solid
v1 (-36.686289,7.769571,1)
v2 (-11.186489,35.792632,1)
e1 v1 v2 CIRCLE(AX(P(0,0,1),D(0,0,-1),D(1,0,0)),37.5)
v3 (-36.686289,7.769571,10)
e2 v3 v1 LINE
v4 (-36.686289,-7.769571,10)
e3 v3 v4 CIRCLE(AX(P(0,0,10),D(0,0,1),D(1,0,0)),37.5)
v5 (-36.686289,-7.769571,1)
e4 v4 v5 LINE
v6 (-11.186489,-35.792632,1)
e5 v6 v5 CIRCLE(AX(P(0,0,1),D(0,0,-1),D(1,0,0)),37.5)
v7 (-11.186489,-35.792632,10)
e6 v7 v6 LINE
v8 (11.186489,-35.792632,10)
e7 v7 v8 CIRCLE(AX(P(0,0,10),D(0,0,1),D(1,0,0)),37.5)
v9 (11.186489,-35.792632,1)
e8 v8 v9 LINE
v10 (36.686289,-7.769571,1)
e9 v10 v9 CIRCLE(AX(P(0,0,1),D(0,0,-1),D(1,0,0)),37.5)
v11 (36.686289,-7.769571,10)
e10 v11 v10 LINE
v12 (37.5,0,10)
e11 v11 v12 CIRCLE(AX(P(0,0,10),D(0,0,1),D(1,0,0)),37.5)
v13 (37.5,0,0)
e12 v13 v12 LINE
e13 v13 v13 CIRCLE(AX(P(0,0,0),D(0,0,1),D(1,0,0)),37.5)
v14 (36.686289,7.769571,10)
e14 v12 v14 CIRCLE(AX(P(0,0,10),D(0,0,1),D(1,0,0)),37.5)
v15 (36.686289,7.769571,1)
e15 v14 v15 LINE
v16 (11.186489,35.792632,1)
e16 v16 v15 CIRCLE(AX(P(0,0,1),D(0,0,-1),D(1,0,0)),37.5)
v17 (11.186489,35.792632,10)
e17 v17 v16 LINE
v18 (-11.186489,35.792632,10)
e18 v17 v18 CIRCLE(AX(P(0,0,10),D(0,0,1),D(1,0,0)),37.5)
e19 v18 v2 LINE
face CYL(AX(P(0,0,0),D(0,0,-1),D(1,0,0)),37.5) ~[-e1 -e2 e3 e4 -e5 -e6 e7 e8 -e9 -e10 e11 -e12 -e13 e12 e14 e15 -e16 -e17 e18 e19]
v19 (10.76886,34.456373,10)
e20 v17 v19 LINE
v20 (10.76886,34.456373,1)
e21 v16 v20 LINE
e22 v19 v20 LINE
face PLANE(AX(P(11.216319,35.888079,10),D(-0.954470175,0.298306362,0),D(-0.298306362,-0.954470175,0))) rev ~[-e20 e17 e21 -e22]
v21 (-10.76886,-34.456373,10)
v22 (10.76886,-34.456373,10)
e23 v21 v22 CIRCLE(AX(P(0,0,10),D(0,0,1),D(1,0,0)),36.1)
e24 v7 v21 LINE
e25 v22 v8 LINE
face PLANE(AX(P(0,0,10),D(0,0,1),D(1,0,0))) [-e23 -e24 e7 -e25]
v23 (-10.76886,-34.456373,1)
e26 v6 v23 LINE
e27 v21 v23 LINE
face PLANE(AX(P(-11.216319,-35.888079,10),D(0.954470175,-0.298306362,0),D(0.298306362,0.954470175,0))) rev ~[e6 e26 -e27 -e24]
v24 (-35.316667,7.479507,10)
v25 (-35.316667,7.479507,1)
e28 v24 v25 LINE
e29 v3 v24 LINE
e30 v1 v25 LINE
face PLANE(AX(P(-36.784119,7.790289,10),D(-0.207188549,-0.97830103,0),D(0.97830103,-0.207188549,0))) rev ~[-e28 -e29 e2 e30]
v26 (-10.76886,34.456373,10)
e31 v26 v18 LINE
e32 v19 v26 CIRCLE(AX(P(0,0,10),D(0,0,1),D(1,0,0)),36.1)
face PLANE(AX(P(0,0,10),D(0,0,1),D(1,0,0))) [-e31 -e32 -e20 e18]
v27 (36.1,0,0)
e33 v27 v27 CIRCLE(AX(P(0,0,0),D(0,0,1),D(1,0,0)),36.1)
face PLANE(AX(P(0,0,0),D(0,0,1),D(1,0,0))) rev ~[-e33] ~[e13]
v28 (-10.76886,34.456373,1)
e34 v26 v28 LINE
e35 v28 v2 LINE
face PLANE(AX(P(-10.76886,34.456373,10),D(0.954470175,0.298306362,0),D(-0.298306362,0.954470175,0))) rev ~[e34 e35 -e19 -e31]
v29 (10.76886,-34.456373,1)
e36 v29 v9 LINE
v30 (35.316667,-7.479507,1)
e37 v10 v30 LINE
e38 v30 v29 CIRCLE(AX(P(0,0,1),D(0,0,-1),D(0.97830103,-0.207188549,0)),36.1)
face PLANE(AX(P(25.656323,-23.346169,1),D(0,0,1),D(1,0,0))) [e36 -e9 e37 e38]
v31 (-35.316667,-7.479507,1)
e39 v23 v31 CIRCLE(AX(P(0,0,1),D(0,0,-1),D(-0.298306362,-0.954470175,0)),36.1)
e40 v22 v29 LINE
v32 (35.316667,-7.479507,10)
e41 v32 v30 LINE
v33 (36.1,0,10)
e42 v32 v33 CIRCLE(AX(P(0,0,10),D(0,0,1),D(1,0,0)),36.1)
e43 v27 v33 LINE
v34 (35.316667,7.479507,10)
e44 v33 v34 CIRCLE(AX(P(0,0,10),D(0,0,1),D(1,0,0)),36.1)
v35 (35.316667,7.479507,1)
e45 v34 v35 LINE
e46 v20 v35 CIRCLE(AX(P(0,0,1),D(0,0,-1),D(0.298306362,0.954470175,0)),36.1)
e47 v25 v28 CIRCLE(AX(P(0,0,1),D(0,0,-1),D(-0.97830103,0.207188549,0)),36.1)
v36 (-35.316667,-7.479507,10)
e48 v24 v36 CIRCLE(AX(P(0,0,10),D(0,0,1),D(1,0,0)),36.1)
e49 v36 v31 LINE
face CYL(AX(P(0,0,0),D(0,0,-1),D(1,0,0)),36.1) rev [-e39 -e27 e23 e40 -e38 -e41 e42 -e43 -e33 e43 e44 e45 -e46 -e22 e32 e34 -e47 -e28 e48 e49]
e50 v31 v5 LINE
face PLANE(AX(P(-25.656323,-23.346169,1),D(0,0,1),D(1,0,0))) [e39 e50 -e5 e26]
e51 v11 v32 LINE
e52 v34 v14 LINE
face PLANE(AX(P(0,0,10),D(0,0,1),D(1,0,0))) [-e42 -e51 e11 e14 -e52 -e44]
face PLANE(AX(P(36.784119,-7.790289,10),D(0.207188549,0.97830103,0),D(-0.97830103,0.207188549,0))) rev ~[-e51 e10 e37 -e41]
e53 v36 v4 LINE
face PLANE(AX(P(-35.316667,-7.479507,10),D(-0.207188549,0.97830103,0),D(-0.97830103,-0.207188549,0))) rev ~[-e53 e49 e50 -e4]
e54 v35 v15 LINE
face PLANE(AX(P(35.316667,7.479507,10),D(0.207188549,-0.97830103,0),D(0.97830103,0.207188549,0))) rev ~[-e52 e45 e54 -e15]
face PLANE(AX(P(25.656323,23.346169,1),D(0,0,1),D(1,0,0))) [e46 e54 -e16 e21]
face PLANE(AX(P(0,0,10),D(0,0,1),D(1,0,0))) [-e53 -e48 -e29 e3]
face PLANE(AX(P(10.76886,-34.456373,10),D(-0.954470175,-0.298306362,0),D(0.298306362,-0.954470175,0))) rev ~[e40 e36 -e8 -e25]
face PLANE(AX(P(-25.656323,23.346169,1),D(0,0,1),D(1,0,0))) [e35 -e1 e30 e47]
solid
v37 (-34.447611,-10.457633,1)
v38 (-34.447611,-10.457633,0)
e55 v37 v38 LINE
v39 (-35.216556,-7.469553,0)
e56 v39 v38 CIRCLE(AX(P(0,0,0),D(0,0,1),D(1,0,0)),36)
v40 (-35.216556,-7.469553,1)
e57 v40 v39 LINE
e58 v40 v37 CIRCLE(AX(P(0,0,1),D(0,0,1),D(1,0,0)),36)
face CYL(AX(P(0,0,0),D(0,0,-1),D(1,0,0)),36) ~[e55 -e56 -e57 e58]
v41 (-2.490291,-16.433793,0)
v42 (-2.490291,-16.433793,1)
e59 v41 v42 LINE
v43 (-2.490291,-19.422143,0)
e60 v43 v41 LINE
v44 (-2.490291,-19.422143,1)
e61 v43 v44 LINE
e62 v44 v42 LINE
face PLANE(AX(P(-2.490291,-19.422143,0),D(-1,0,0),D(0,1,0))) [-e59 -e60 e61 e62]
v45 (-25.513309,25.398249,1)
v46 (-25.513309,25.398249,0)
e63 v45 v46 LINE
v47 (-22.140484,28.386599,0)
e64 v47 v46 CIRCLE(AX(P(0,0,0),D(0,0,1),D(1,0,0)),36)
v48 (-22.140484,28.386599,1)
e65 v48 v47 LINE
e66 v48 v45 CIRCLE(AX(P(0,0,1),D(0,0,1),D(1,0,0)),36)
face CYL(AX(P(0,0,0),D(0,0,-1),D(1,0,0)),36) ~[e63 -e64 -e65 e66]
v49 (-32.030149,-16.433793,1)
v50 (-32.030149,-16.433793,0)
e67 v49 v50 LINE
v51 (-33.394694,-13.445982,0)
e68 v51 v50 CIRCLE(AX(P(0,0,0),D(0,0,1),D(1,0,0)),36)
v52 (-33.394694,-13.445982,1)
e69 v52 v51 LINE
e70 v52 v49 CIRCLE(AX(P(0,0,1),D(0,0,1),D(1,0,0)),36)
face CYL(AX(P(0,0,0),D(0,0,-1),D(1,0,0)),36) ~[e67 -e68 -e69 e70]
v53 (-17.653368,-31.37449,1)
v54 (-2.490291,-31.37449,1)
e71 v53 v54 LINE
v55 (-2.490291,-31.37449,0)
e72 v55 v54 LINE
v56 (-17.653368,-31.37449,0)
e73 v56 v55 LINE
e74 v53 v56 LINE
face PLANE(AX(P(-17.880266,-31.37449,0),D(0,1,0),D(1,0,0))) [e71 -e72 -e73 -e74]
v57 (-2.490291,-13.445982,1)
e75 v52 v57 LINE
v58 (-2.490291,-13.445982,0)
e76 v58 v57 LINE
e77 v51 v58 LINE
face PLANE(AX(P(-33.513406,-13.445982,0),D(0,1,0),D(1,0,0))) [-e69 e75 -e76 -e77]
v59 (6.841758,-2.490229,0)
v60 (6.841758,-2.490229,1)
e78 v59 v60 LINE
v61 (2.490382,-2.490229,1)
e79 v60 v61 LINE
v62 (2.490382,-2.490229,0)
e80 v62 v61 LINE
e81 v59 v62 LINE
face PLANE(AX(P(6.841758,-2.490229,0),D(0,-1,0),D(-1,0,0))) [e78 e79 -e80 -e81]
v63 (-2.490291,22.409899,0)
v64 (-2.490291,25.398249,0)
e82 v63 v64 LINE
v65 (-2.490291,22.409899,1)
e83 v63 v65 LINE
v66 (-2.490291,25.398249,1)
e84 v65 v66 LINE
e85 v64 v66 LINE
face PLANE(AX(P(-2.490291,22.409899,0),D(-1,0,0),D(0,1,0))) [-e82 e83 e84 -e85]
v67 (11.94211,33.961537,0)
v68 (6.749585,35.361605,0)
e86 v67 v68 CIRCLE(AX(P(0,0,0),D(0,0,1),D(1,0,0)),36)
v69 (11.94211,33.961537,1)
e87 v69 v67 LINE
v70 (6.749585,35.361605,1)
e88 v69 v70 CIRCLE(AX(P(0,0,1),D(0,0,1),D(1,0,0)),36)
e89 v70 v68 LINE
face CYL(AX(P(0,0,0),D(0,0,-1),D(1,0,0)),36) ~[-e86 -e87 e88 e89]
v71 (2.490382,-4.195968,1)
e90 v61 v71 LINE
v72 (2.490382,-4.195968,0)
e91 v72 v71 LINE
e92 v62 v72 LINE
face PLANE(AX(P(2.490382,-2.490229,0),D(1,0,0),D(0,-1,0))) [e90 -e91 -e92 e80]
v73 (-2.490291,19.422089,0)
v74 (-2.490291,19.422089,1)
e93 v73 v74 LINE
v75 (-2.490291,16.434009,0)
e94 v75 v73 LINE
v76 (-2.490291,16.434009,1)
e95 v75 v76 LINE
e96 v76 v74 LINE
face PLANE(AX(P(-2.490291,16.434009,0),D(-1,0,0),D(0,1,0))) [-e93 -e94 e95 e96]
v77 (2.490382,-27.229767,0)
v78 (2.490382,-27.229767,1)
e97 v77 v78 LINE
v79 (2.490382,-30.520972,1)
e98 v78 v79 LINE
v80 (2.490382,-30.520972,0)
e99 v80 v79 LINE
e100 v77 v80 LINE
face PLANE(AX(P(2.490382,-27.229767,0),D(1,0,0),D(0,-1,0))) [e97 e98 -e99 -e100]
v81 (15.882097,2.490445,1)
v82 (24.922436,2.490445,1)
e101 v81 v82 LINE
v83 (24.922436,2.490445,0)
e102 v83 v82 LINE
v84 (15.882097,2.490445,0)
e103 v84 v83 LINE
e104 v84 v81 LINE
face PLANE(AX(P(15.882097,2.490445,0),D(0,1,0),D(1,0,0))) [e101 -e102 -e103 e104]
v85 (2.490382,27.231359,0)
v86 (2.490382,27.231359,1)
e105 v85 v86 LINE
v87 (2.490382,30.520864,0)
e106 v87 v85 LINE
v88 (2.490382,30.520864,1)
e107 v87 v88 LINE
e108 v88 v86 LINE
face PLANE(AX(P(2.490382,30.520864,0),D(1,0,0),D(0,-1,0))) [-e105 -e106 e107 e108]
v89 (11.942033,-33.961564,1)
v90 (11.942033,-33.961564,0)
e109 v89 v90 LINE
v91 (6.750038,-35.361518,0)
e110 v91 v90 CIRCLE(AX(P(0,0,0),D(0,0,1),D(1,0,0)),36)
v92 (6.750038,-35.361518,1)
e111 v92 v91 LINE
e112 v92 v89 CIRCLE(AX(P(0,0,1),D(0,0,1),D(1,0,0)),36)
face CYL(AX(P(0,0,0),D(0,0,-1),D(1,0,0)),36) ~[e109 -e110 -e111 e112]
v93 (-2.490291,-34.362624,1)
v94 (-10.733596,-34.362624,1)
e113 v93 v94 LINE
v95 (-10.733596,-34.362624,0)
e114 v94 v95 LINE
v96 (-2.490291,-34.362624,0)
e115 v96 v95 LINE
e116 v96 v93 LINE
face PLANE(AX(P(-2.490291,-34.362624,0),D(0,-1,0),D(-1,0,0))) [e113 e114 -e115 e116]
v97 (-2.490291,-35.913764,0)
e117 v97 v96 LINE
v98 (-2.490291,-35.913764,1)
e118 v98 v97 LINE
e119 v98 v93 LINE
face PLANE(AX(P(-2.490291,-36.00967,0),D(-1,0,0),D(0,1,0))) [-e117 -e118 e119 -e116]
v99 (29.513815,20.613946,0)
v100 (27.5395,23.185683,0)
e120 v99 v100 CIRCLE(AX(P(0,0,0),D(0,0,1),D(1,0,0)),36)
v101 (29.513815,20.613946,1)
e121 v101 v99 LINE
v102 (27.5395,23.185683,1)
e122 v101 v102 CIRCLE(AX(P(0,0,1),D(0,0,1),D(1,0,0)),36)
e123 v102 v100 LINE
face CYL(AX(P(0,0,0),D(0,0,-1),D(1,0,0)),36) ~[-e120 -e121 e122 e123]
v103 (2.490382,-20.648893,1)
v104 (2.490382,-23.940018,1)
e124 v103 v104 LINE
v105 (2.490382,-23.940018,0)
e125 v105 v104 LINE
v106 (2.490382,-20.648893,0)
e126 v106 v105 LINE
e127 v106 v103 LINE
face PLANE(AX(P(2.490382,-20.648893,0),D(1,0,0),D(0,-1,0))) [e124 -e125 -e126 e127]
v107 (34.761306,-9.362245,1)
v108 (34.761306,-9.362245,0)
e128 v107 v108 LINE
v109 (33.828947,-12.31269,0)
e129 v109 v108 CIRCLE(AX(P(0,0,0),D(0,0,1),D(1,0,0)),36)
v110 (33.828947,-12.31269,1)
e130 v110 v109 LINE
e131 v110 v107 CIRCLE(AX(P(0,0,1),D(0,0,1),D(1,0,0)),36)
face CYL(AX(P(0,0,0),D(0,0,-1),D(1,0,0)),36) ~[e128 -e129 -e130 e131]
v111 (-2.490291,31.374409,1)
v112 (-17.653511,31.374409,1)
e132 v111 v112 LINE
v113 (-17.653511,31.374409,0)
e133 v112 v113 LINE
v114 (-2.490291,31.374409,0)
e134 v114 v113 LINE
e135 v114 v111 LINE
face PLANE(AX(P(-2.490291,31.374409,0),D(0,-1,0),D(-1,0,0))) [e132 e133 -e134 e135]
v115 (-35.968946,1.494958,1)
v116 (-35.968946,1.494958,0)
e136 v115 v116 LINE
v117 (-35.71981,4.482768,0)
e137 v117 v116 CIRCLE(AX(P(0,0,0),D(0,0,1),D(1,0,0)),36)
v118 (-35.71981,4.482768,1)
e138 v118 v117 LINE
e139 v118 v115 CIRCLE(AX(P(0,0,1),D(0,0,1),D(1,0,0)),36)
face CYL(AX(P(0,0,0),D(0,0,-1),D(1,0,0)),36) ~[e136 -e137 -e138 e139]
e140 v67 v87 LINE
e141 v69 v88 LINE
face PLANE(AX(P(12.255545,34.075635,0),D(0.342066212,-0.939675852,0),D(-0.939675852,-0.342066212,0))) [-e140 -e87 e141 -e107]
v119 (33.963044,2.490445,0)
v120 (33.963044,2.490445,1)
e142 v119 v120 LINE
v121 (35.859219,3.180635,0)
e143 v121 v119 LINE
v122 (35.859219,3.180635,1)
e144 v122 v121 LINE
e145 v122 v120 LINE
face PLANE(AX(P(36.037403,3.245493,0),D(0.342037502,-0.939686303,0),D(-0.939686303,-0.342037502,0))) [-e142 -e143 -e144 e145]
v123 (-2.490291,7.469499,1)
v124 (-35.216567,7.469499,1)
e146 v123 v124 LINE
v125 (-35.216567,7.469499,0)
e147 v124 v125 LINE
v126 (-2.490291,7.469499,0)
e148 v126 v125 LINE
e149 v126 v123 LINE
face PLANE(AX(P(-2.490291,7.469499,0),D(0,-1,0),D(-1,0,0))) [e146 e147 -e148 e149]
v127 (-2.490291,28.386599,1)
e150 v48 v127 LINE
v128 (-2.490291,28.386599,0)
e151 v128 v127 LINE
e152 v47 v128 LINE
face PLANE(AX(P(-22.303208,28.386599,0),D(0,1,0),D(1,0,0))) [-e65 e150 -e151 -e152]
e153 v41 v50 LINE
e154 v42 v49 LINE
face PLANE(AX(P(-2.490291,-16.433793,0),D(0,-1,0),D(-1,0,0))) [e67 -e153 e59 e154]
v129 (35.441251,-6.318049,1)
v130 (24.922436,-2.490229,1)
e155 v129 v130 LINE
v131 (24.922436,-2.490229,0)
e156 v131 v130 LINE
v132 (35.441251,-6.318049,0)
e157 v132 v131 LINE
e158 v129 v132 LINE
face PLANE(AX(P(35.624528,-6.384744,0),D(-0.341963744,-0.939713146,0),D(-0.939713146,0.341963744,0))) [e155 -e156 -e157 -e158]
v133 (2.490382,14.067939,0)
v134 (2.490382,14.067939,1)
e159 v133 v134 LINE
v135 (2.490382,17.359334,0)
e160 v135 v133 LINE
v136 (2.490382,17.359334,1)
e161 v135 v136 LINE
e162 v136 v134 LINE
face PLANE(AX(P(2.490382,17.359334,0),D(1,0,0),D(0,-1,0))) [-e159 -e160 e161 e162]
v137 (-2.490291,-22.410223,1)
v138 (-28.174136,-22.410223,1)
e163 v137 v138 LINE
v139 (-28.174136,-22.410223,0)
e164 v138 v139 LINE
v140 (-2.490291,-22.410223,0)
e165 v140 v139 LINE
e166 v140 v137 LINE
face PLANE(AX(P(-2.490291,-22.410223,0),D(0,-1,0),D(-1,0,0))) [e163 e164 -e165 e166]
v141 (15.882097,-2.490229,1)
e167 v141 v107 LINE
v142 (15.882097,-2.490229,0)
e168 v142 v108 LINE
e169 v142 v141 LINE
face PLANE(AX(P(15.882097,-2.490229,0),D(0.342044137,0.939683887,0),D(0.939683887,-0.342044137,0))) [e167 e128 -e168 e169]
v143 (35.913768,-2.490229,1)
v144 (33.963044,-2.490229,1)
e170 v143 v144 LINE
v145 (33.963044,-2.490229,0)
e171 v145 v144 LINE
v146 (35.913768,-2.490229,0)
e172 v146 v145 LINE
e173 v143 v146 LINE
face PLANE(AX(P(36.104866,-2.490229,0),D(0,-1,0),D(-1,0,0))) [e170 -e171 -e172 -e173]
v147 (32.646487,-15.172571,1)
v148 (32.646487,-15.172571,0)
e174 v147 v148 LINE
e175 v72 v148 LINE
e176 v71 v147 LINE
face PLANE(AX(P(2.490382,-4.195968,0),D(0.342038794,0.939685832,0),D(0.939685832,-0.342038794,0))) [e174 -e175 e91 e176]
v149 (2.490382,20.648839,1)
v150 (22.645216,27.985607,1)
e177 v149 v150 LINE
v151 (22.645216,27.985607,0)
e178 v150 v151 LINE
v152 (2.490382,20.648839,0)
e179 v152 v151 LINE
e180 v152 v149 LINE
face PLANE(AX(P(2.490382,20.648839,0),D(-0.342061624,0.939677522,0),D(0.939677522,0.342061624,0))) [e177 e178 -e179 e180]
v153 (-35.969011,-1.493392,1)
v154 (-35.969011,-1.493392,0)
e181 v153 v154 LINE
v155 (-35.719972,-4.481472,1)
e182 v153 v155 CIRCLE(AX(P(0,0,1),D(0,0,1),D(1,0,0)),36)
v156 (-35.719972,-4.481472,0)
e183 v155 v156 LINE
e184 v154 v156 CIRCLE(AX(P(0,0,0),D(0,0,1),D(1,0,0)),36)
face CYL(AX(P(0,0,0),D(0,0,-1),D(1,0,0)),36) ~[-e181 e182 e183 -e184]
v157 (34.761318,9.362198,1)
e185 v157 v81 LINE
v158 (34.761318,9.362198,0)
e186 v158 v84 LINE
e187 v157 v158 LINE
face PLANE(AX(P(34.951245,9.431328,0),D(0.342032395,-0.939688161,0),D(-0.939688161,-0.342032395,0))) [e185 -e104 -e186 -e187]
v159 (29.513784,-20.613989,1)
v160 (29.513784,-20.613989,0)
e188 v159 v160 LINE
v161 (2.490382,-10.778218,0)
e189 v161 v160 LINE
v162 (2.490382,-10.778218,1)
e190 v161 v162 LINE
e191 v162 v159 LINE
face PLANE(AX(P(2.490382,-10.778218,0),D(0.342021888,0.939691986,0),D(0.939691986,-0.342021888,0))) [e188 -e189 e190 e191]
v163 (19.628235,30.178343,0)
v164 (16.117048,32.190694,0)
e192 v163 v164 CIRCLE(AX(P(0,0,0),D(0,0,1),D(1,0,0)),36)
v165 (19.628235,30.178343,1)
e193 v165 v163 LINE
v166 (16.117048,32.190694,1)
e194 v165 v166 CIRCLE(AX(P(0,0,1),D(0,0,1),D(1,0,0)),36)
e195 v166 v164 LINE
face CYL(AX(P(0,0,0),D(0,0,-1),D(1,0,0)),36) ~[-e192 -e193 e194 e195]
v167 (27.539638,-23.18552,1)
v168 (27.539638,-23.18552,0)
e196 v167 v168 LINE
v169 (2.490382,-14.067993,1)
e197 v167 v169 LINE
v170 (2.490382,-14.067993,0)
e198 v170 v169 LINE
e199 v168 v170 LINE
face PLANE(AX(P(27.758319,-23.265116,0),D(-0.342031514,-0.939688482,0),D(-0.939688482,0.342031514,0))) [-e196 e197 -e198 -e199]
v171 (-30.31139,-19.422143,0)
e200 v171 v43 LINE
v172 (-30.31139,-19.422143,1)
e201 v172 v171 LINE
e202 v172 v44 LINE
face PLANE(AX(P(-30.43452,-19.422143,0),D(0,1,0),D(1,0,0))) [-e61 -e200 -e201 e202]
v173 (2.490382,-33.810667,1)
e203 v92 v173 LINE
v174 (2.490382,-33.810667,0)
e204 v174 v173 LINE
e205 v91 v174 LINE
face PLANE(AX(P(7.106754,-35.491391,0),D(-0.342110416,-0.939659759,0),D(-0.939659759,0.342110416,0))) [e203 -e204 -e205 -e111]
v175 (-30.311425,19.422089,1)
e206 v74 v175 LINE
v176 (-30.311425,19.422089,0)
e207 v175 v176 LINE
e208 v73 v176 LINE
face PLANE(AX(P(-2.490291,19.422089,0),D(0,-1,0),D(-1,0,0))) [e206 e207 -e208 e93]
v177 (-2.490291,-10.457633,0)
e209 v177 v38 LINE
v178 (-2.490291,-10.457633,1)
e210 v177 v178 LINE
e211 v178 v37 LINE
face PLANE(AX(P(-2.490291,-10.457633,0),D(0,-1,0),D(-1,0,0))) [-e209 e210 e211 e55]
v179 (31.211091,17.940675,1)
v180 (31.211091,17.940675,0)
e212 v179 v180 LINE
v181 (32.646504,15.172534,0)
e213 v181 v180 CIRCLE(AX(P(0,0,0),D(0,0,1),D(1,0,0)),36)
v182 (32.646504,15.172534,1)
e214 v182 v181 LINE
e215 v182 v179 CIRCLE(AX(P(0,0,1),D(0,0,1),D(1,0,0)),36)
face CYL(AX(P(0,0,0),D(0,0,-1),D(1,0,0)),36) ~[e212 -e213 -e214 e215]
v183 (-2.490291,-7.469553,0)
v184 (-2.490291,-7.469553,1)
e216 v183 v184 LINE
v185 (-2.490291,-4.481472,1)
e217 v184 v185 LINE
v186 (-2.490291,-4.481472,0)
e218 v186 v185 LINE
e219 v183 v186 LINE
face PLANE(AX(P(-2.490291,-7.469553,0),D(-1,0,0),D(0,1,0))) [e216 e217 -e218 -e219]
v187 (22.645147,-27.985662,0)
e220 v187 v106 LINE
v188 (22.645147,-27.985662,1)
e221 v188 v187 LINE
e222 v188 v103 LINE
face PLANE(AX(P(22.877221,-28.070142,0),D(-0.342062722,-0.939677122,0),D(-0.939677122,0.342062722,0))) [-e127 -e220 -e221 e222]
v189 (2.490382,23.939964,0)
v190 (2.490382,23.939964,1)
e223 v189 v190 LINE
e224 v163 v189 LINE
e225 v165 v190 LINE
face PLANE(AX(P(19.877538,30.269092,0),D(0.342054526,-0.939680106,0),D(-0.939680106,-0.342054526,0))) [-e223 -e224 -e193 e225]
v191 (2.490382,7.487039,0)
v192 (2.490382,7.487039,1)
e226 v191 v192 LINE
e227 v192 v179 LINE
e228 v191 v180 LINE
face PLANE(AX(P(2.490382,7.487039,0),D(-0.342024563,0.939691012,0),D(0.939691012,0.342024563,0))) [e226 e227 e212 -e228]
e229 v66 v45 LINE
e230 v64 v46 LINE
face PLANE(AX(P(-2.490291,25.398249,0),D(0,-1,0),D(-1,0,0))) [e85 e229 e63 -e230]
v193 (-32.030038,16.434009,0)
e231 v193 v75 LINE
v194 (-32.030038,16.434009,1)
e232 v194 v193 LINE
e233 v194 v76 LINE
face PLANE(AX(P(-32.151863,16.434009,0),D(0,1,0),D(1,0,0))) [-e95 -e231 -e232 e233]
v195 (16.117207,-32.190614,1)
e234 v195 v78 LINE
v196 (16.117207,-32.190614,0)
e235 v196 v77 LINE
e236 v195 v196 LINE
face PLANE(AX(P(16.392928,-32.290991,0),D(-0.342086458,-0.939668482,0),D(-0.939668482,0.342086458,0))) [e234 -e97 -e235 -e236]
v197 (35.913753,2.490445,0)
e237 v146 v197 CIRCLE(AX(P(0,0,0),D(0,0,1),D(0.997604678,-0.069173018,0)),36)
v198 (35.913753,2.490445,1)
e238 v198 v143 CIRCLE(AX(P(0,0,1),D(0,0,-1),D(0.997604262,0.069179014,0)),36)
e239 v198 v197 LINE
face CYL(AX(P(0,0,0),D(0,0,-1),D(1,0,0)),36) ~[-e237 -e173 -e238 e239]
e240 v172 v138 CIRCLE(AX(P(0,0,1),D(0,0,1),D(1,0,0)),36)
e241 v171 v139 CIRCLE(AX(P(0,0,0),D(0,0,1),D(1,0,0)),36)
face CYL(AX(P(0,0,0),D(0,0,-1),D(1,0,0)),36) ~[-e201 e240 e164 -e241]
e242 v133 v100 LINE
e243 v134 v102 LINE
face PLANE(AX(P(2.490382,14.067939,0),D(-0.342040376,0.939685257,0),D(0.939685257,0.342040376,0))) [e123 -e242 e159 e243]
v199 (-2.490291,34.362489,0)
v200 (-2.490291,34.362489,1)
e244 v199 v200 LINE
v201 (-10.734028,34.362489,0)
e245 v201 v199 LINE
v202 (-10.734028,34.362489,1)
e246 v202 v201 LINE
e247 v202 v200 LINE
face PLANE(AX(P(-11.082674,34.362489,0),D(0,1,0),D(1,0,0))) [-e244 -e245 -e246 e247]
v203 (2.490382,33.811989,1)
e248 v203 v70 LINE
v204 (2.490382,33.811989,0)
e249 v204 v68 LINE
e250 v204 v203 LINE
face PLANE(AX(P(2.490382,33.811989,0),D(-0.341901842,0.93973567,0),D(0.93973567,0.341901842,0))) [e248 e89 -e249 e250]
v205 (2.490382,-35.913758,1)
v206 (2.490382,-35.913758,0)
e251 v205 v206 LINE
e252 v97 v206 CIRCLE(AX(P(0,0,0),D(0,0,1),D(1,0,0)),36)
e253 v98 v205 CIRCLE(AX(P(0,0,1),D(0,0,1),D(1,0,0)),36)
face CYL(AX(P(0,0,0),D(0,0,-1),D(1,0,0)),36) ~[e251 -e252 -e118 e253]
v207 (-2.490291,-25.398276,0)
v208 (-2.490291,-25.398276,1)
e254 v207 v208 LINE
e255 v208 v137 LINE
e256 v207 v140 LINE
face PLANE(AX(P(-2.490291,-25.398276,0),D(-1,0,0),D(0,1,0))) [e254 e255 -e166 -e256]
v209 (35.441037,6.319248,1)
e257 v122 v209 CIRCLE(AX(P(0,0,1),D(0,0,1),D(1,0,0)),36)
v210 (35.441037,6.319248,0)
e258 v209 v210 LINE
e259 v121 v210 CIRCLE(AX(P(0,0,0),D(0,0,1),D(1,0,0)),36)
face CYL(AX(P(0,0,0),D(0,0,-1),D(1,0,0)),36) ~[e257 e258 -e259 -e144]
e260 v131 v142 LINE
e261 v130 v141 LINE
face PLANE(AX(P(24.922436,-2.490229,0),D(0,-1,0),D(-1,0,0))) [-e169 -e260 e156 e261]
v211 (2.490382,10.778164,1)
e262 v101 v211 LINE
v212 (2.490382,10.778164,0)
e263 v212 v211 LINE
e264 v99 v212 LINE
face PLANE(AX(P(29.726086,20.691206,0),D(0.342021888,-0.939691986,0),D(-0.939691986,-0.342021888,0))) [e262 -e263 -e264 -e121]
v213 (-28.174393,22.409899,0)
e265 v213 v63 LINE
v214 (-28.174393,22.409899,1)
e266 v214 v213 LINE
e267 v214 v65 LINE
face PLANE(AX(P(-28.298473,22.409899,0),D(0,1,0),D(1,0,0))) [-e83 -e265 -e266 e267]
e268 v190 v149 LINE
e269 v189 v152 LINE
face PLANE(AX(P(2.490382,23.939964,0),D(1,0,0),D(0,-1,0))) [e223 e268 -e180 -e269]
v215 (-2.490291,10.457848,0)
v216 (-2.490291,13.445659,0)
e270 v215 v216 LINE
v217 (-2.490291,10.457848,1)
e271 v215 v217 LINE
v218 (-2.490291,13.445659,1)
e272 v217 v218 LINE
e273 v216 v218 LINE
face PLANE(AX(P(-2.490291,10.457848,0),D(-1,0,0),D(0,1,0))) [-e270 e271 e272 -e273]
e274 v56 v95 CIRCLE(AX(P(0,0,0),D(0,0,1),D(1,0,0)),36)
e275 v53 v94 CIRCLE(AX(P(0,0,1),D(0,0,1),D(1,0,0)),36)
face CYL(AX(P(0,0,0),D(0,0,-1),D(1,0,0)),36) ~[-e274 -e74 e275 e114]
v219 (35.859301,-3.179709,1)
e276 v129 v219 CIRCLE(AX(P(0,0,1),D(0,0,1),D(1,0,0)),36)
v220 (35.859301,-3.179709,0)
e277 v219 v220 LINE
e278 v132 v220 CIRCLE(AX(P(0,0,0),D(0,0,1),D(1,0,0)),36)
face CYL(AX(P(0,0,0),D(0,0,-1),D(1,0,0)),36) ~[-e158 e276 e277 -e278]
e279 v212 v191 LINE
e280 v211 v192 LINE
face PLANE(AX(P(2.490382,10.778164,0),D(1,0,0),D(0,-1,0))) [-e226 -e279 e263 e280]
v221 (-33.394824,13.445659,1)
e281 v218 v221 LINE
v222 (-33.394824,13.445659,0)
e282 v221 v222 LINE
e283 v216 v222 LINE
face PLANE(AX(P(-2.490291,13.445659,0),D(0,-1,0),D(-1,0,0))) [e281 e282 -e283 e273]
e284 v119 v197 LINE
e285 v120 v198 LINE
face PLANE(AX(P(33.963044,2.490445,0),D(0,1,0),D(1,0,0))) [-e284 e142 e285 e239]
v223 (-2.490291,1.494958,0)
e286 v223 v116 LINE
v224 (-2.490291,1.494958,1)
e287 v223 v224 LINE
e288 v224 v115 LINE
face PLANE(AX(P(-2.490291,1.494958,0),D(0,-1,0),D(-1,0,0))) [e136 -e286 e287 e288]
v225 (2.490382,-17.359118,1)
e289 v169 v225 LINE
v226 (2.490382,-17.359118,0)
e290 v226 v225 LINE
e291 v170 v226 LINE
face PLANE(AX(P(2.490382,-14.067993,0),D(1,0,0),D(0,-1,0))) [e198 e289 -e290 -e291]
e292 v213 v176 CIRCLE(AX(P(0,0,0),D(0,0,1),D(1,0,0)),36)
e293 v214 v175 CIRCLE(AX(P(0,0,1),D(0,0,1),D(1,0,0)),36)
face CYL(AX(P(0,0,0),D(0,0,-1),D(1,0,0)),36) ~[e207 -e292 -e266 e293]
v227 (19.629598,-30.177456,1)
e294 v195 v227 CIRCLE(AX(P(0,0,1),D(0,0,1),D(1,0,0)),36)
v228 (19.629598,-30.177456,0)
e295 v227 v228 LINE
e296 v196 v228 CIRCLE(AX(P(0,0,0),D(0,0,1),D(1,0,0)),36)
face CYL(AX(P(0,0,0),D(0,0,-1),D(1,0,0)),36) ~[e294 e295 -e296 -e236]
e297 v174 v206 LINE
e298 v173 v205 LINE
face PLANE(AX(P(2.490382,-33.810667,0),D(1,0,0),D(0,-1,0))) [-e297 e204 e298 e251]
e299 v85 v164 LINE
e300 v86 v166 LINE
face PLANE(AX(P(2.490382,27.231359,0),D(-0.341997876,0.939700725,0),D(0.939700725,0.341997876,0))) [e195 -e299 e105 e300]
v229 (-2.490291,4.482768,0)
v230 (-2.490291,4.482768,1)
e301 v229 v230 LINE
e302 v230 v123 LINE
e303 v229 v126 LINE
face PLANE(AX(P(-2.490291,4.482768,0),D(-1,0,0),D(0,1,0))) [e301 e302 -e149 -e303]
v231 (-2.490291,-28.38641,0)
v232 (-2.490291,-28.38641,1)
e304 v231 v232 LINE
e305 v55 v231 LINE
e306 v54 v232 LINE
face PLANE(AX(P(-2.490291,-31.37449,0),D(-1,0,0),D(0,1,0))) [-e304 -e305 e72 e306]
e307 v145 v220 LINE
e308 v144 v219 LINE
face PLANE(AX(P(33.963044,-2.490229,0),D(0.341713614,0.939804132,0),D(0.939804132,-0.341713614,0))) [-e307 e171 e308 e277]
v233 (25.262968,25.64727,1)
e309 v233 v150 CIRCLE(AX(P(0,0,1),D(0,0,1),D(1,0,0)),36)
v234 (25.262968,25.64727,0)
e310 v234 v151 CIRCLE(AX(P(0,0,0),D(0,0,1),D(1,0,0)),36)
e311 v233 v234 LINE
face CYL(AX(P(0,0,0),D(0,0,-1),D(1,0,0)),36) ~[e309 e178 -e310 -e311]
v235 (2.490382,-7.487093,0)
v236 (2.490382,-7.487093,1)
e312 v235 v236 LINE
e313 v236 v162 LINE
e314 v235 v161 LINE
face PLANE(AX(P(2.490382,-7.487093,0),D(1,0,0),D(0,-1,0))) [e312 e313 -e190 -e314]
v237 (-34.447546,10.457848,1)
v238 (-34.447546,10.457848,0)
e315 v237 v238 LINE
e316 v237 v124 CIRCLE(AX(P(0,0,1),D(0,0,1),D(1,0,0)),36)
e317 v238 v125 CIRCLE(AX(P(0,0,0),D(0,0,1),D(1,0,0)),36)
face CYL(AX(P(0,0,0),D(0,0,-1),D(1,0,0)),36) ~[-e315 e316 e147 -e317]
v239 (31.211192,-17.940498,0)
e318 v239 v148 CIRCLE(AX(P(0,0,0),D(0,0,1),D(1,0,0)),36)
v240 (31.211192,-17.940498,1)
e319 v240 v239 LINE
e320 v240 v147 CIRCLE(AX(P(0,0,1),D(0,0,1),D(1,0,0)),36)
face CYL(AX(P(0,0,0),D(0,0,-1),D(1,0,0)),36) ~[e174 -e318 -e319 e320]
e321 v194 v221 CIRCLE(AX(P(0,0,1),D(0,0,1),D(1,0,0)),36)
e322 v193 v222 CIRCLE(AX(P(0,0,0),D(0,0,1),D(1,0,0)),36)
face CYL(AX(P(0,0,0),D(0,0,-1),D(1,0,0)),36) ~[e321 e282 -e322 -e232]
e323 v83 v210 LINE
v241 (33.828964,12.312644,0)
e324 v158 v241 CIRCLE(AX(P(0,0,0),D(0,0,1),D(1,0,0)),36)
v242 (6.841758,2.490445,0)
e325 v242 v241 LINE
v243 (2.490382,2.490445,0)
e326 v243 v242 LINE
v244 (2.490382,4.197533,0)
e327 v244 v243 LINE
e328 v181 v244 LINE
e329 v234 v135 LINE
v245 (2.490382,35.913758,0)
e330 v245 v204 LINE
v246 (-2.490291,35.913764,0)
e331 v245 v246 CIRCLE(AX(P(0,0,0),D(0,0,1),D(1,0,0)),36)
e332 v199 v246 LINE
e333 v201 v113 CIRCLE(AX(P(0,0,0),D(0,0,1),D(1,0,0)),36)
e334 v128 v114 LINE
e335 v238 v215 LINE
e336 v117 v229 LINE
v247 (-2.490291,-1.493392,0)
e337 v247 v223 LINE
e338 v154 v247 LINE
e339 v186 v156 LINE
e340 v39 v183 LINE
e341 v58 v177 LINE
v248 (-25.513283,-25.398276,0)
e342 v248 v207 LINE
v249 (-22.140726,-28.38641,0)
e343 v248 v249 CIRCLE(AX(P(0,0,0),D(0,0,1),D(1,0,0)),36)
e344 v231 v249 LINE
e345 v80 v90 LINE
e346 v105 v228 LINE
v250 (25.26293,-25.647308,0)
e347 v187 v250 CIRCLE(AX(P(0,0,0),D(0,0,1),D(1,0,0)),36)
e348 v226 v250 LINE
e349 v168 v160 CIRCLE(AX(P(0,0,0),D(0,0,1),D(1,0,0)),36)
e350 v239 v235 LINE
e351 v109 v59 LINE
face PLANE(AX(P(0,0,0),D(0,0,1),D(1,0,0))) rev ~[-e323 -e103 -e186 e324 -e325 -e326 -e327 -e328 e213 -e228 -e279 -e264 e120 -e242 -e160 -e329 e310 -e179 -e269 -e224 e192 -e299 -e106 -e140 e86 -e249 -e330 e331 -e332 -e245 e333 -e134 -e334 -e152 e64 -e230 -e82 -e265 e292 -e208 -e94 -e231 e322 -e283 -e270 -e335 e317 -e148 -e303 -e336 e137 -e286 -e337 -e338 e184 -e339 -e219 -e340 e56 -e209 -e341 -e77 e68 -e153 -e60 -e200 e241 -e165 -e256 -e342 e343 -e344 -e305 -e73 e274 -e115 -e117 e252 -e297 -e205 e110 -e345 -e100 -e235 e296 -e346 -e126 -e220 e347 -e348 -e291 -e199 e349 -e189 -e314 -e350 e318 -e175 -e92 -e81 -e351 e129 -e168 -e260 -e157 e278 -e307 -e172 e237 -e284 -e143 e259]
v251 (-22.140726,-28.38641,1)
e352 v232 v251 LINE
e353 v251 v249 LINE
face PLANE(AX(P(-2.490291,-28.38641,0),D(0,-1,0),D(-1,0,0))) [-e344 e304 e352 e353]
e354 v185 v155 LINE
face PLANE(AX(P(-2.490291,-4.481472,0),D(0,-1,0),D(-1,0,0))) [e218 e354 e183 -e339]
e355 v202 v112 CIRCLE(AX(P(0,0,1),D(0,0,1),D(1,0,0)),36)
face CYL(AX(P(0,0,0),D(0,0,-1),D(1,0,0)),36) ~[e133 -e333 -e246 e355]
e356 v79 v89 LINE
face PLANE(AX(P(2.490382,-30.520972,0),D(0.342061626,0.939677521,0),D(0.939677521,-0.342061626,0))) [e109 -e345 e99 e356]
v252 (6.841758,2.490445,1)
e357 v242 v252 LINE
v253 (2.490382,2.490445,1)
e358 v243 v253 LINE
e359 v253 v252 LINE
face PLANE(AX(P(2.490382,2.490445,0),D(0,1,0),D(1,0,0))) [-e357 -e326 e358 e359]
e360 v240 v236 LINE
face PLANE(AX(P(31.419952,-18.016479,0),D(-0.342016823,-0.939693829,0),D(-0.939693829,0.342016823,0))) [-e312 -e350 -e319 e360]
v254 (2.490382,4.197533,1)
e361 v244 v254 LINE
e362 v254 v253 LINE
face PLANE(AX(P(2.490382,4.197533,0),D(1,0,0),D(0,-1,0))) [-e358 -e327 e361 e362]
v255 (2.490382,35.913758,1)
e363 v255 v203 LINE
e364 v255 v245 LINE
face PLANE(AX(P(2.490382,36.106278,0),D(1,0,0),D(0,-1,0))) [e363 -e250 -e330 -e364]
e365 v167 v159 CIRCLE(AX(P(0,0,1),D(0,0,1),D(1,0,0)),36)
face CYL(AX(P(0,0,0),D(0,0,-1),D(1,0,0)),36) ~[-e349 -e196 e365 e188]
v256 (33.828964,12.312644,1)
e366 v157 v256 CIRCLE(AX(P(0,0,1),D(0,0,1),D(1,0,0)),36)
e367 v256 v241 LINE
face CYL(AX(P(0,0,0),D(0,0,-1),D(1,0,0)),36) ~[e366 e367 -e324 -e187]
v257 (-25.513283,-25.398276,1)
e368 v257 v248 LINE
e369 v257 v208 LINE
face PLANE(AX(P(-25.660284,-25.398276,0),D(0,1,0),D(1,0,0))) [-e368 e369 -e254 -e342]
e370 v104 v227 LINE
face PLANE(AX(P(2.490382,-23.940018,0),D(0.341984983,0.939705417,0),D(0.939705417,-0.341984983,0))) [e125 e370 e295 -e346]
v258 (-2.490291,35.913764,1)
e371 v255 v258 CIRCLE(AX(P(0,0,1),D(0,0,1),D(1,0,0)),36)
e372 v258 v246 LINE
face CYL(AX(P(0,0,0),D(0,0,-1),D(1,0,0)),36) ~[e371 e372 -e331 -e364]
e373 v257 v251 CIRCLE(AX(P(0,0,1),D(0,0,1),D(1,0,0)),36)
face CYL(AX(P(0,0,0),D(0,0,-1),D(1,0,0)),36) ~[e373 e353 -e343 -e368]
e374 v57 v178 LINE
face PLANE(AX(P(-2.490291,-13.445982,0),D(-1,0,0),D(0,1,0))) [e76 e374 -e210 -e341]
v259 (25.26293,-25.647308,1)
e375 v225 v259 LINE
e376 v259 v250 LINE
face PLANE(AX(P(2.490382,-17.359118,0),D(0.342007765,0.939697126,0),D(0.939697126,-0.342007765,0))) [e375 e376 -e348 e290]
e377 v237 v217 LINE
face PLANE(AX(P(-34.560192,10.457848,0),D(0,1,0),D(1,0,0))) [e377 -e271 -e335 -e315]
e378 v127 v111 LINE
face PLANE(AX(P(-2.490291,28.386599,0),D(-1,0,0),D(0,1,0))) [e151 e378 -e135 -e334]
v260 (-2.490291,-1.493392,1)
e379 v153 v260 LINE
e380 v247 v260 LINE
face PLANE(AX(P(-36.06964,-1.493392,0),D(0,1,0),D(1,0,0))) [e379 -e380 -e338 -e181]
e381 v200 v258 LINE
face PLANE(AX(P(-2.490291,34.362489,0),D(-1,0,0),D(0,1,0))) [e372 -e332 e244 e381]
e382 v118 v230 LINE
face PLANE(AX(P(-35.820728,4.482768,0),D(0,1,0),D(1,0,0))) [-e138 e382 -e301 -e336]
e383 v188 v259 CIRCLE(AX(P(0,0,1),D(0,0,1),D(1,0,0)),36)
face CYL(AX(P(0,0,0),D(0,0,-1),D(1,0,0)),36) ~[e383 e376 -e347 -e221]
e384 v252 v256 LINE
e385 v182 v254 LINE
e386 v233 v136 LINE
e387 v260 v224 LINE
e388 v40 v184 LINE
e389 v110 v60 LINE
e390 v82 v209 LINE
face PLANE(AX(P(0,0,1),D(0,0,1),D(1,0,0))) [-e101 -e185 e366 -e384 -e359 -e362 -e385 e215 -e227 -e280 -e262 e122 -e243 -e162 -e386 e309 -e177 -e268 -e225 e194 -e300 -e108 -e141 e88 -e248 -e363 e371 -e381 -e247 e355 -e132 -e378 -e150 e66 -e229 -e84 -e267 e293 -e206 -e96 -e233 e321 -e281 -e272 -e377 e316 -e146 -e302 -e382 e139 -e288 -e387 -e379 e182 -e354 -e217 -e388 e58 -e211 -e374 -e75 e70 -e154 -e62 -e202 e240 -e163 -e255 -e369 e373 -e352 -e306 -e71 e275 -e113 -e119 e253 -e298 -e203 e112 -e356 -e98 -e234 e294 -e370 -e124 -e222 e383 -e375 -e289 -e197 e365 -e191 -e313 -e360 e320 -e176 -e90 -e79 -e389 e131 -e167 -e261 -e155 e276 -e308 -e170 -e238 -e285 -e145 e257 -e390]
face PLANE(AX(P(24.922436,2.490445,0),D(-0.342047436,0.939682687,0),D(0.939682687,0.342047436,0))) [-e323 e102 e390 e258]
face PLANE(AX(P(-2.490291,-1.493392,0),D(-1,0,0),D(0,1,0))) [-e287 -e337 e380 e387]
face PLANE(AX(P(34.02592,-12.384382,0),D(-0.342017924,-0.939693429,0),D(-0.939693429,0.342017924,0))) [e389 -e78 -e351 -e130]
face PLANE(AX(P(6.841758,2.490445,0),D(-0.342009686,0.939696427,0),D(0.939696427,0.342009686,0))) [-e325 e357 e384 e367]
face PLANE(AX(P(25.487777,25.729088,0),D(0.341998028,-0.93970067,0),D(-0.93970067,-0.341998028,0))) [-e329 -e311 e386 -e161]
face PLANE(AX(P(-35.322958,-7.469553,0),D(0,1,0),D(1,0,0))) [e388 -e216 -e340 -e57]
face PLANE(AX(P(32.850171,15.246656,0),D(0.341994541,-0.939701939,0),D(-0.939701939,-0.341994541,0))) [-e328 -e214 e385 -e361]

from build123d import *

# Parameters (mm, degrees)
F1_R     = 37.5
F1_R_2   = 36.1
F2_DEPTH = 10
F3_R     = 36
F4_DEPTH = 1
F5_DEPTH = 1
F7_DEPTH = 9


with BuildPart() as f2:
    # F1 (on Top) → F2 (new body)
    with BuildSketch(Plane.XY):
        Circle(F1_R)
        Circle(F1_R_2, mode=Mode.SUBTRACT)
    extrude(amount=F2_DEPTH)

    # F6 (on face) → F7 (cut)
    with BuildSketch(Plane.XY.offset(10)):
        with BuildLine():
            Line((-36.7841187228, 7.7902894544), (-35.316667178, 7.4795066305))
            ThreePointArc((-35.316667178, 7.4795066305), (-26.7003142326, 24.2961564837), (-10.7688596698, 34.4563733061))
            Line((-10.7688596698, 34.4563733061), (-11.2163192129, 35.8880785682))
            ThreePointArc((-11.2163192129, 35.8880785682), (-27.8097455719, 25.3056920716), (-36.7841187228, 7.7902894544))
        make_face()
        with BuildLine():
            Line((35.316667178, 7.4795066305), (36.7841187228, 7.7902894544))
            ThreePointArc((36.7841187228, 7.7902894544), (27.8097455719, 25.3056920716), (11.2163192129, 35.8880785682))
            Line((11.2163192129, 35.8880785682), (10.7688596698, 34.4563733061))
            ThreePointArc((10.7688596698, 34.4563733061), (26.7003142326, 24.2961564837), (35.316667178, 7.4795066305))
        make_face()
        with BuildLine():
            Line((10.7688596698, -34.4563733061), (11.2163192129, -35.8880785682))
            ThreePointArc((11.2163192129, -35.8880785682), (27.8097455719, -25.3056920716), (36.7841187228, -7.7902894544))
            Line((36.7841187228, -7.7902894544), (35.316667178, -7.4795066305))
            ThreePointArc((35.316667178, -7.4795066305), (26.7003142326, -24.2961564837), (10.7688596698, -34.4563733061))
        make_face()
        with BuildLine():
            Line((-35.316667178, -7.4795066305), (-36.7841187228, -7.7902894544))
            ThreePointArc((-36.7841187228, -7.7902894544), (-27.8097455719, -25.3056920716), (-11.2163192129, -35.8880785682))
            Line((-11.2163192129, -35.8880785682), (-10.7688596698, -34.4563733061))
            ThreePointArc((-10.7688596698, -34.4563733061), (-26.7003142326, -24.2961564837), (-35.316667178, -7.4795066305))
        make_face()
    extrude(amount=-F7_DEPTH, mode=Mode.SUBTRACT)


with BuildPart() as f4:
    # F3 (on Top) → F4 (new body)
    with BuildSketch(Plane.XY):
        Circle(F3_R)
    extrude(amount=F4_DEPTH)

    # F0 (on Top) → F5 (cut)
    with BuildSketch(Plane.XY):
        Polygon((-2.4902910933, -34.3626238759), (-11.0826741202, -34.3626238759), (-10.311164963, -34.6114821287), (-7.0564703338, -35.4167498713), (-3.6922154676, -35.9188919628), (-2.4902910933, -36.009670445), align=None)
        Polygon((7.1067539106, -35.491391156), (2.4903820491, -33.8106669574), (2.4903820491, -36.1048205425), (5.8271119297, -35.7271075774), align=None)
        Polygon((-2.4902910933, -28.3864097812), (-22.3032075436, -28.3864097812), (-21.9489178016, -28.6704298539), (-19.2770242661, -30.5341142514), (-17.8802661697, -31.3744898433), (-2.4902910933, -31.3744898433), align=None)
        Polygon((16.3929284881, -32.2909909103), (2.4903820491, -27.2297667069), (2.4903820491, -30.52097242), (12.2555453479, -34.0756893929), (13.7035754764, -33.5237324744), (15.1834482354, -32.881024059), align=None)
        Polygon((-2.4902910933, -22.4102226717), (-28.2984732461, -22.4102226717), (-27.7919325539, -23.0500436622), (-26.726094947, -24.2767944941), (-25.6602843254, -25.3982757485), (-2.4902910933, -25.3982757485), align=None)
        Polygon((22.877221436, -28.0701422988), (2.4903820491, -20.6488934416), (2.4903820491, -23.9400181989), (19.8775377035, -30.2676885812), (20.7367490209, -29.6967340255), (22.0223277634, -28.7552985597), align=None)
        Polygon((-2.4902910933, -16.4337926948), (-32.1518632989, -16.4337926948), (-31.48424747, -17.687258954), (-30.6497546691, -19.09265234), (-30.4345200753, -19.4221426096), (-2.4902910933, -19.4221426096), align=None)
        Polygon((27.7583188949, -23.2651163443), (2.4903820491, -14.0679931911), (2.4903820491, -17.3591179483), (25.4877774299, -25.7291422675), (25.6105604542, -25.6105419616), (26.7099407642, -24.4612658687), align=None)
        Polygon((-2.4902910933, -10.4576325706), (-34.560191604, -10.4576325706), (-34.1722242324, -11.6843834025), (-33.6012696767, -13.2392752401), (-33.5134056048, -13.4459824855), (-2.4902910933, -13.4459824855), align=None)
        Polygon((31.4199515476, -18.0164793708), (2.4903820491, -7.4870929405), (2.4903820491, -10.7782176978), (29.7260855176, -20.6912603313), (30.5809791902, -19.4073007056), (31.4080780243, -18.0386073005), align=None)
        Polygon((-2.4902910933, -4.4814724464), (-35.8207280066, -4.4814724464), (-35.738773711, -5.1623110626), (-35.4591252536, -6.8340491629), (-35.3229575304, -7.4695525085), (-2.4902910933, -7.4695525085), align=None)
        Polygon((36.1048660204, -2.4902286301), (33.9630443413, -2.4902286301), (36.0374028202, -3.244467208), align=None)
        Polygon((24.9224358124, -2.4902286301), (15.8820971364, -2.4902286301), (34.9512452974, -9.4313823695), (35.0551386257, -9.065192119), (35.4269957851, -7.4592981021), (35.6245280352, -6.3847442497), align=None)
        Polygon((6.8417584603, -2.4902286301), (2.4903820491, -2.4902286301), (2.4903820491, -4.1959681833), (32.8501713912, -15.2467102245), (32.8809346105, -15.1835646691), (33.5237239818, -13.7034220573), (34.0259200439, -12.3843815675), align=None)
        Polygon((-2.4902910933, 1.4949575306), (-36.0696402299, 1.4949575306), (-36.1062052844, -2.69853e-05), (-36.0696402299, -1.4933923843), (-2.4902910933, -1.4933923843), align=None)
        Polygon((36.1048660204, 2.4904445123), (36.0374028202, 3.2454926487), (33.9630443413, 2.4904445123), align=None)
        Polygon((-2.4902910933, 7.4694985379), (-35.3229575304, 7.4694985379), (-35.4591252536, 6.8358841619), (-35.738773711, 5.162257092), (-35.8207280066, 4.4827677399), (-2.4902910933, 4.4827677399), align=None)
        Polygon((35.0551386257, 9.0654080012), (34.9512452974, 9.431328399), (15.8820971364, 2.4904445123), (24.9224358124, 2.4904445123), (35.6245280352, 6.3860395431), (35.4269957851, 7.4595139843), align=None)
        Polygon((-2.4902910933, 13.4456586621), (-33.5134056048, 13.4456586621), (-33.6012696767, 13.2394911224), (-34.1722242324, 11.6845992848), (-34.560191604, 10.4578484528), (-2.4902910933, 10.4578484528), align=None)
        Polygon((32.8809346105, 15.1835106986), (32.8501713912, 15.2466562539), (2.4903820491, 4.1975333295), (2.4903820491, 2.4904445123), (6.8417584603, 2.4904445123), (34.0259200439, 12.384327597), (33.5237239818, 13.7036379396), align=None)
        Polygon((-2.4902910933, 19.4220886391), (-30.4345200753, 19.4220886391), (-30.6497546691, 19.0925983694), (-31.48424747, 17.6872049834), (-32.1518632989, 16.434008577), (-2.4902910933, 16.434008577), align=None)
        Polygon((30.5809791902, 19.4075165879), (29.7260855176, 20.6912063608), (2.4903820491, 10.7781637273), (2.4903820491, 7.48703897), (31.4199515476, 18.0166952531), (31.4080780243, 18.0382834771), align=None)
        Polygon((-2.4902910933, 25.3982487633), (-25.6602843254, 25.3982487633), (-26.726094947, 24.2767405236), (-27.7919325539, 23.0497198388), (-28.2984732461, 22.4098988484), (-2.4902910933, 22.4098988484), align=None)
        Polygon((25.6105604542, 25.6103530646), (25.4877774299, 25.7290882969), (2.4903820491, 17.3593338306), (2.4903820491, 14.0679392205), (27.7583188949, 23.2653322266), (26.7099407642, 24.4626691033), align=None)
        Polygon((20.7367490209, 29.6967340255), (19.8775377035, 30.2690918158), (2.4903820491, 23.9399642283), (2.4903820491, 20.648839471), (22.877221436, 28.0700613429), (22.0223277634, 28.7552176039), align=None)
        Polygon((-2.4902910933, 31.3744088874), (-17.8802661697, 31.3744088874), (-19.2770242661, 30.5340872661), (-21.9489178016, 28.6702139717), (-22.3032075436, 28.3865986782), (-2.4902910933, 28.3865986782), align=None)
        Polygon((13.7035754764, 33.523786445), (12.2555453479, 34.0756354224), (2.4903820491, 30.5208644788), (2.4903820491, 27.2313588384), (16.3929284881, 32.2910988514), (15.1834482354, 32.8809970737), align=None)
        Polygon((-2.4902910933, 34.3624889495), (-2.4902910933, 36.011019709), (-3.6922154676, 35.9187300511), (-7.0564703338, 35.416533989), (-10.311164963, 34.6115630846), (-11.0826741202, 34.3624889495), align=None)
        Polygon((5.8271119297, 35.7271345626), (2.4903820491, 36.1062777476), (2.4903820491, 33.8119892361), (7.1067539106, 35.4915530676), align=None)
    extrude(amount=F5_DEPTH, mode=Mode.SUBTRACT)


solid = Compound([f2.part, f4.part])
